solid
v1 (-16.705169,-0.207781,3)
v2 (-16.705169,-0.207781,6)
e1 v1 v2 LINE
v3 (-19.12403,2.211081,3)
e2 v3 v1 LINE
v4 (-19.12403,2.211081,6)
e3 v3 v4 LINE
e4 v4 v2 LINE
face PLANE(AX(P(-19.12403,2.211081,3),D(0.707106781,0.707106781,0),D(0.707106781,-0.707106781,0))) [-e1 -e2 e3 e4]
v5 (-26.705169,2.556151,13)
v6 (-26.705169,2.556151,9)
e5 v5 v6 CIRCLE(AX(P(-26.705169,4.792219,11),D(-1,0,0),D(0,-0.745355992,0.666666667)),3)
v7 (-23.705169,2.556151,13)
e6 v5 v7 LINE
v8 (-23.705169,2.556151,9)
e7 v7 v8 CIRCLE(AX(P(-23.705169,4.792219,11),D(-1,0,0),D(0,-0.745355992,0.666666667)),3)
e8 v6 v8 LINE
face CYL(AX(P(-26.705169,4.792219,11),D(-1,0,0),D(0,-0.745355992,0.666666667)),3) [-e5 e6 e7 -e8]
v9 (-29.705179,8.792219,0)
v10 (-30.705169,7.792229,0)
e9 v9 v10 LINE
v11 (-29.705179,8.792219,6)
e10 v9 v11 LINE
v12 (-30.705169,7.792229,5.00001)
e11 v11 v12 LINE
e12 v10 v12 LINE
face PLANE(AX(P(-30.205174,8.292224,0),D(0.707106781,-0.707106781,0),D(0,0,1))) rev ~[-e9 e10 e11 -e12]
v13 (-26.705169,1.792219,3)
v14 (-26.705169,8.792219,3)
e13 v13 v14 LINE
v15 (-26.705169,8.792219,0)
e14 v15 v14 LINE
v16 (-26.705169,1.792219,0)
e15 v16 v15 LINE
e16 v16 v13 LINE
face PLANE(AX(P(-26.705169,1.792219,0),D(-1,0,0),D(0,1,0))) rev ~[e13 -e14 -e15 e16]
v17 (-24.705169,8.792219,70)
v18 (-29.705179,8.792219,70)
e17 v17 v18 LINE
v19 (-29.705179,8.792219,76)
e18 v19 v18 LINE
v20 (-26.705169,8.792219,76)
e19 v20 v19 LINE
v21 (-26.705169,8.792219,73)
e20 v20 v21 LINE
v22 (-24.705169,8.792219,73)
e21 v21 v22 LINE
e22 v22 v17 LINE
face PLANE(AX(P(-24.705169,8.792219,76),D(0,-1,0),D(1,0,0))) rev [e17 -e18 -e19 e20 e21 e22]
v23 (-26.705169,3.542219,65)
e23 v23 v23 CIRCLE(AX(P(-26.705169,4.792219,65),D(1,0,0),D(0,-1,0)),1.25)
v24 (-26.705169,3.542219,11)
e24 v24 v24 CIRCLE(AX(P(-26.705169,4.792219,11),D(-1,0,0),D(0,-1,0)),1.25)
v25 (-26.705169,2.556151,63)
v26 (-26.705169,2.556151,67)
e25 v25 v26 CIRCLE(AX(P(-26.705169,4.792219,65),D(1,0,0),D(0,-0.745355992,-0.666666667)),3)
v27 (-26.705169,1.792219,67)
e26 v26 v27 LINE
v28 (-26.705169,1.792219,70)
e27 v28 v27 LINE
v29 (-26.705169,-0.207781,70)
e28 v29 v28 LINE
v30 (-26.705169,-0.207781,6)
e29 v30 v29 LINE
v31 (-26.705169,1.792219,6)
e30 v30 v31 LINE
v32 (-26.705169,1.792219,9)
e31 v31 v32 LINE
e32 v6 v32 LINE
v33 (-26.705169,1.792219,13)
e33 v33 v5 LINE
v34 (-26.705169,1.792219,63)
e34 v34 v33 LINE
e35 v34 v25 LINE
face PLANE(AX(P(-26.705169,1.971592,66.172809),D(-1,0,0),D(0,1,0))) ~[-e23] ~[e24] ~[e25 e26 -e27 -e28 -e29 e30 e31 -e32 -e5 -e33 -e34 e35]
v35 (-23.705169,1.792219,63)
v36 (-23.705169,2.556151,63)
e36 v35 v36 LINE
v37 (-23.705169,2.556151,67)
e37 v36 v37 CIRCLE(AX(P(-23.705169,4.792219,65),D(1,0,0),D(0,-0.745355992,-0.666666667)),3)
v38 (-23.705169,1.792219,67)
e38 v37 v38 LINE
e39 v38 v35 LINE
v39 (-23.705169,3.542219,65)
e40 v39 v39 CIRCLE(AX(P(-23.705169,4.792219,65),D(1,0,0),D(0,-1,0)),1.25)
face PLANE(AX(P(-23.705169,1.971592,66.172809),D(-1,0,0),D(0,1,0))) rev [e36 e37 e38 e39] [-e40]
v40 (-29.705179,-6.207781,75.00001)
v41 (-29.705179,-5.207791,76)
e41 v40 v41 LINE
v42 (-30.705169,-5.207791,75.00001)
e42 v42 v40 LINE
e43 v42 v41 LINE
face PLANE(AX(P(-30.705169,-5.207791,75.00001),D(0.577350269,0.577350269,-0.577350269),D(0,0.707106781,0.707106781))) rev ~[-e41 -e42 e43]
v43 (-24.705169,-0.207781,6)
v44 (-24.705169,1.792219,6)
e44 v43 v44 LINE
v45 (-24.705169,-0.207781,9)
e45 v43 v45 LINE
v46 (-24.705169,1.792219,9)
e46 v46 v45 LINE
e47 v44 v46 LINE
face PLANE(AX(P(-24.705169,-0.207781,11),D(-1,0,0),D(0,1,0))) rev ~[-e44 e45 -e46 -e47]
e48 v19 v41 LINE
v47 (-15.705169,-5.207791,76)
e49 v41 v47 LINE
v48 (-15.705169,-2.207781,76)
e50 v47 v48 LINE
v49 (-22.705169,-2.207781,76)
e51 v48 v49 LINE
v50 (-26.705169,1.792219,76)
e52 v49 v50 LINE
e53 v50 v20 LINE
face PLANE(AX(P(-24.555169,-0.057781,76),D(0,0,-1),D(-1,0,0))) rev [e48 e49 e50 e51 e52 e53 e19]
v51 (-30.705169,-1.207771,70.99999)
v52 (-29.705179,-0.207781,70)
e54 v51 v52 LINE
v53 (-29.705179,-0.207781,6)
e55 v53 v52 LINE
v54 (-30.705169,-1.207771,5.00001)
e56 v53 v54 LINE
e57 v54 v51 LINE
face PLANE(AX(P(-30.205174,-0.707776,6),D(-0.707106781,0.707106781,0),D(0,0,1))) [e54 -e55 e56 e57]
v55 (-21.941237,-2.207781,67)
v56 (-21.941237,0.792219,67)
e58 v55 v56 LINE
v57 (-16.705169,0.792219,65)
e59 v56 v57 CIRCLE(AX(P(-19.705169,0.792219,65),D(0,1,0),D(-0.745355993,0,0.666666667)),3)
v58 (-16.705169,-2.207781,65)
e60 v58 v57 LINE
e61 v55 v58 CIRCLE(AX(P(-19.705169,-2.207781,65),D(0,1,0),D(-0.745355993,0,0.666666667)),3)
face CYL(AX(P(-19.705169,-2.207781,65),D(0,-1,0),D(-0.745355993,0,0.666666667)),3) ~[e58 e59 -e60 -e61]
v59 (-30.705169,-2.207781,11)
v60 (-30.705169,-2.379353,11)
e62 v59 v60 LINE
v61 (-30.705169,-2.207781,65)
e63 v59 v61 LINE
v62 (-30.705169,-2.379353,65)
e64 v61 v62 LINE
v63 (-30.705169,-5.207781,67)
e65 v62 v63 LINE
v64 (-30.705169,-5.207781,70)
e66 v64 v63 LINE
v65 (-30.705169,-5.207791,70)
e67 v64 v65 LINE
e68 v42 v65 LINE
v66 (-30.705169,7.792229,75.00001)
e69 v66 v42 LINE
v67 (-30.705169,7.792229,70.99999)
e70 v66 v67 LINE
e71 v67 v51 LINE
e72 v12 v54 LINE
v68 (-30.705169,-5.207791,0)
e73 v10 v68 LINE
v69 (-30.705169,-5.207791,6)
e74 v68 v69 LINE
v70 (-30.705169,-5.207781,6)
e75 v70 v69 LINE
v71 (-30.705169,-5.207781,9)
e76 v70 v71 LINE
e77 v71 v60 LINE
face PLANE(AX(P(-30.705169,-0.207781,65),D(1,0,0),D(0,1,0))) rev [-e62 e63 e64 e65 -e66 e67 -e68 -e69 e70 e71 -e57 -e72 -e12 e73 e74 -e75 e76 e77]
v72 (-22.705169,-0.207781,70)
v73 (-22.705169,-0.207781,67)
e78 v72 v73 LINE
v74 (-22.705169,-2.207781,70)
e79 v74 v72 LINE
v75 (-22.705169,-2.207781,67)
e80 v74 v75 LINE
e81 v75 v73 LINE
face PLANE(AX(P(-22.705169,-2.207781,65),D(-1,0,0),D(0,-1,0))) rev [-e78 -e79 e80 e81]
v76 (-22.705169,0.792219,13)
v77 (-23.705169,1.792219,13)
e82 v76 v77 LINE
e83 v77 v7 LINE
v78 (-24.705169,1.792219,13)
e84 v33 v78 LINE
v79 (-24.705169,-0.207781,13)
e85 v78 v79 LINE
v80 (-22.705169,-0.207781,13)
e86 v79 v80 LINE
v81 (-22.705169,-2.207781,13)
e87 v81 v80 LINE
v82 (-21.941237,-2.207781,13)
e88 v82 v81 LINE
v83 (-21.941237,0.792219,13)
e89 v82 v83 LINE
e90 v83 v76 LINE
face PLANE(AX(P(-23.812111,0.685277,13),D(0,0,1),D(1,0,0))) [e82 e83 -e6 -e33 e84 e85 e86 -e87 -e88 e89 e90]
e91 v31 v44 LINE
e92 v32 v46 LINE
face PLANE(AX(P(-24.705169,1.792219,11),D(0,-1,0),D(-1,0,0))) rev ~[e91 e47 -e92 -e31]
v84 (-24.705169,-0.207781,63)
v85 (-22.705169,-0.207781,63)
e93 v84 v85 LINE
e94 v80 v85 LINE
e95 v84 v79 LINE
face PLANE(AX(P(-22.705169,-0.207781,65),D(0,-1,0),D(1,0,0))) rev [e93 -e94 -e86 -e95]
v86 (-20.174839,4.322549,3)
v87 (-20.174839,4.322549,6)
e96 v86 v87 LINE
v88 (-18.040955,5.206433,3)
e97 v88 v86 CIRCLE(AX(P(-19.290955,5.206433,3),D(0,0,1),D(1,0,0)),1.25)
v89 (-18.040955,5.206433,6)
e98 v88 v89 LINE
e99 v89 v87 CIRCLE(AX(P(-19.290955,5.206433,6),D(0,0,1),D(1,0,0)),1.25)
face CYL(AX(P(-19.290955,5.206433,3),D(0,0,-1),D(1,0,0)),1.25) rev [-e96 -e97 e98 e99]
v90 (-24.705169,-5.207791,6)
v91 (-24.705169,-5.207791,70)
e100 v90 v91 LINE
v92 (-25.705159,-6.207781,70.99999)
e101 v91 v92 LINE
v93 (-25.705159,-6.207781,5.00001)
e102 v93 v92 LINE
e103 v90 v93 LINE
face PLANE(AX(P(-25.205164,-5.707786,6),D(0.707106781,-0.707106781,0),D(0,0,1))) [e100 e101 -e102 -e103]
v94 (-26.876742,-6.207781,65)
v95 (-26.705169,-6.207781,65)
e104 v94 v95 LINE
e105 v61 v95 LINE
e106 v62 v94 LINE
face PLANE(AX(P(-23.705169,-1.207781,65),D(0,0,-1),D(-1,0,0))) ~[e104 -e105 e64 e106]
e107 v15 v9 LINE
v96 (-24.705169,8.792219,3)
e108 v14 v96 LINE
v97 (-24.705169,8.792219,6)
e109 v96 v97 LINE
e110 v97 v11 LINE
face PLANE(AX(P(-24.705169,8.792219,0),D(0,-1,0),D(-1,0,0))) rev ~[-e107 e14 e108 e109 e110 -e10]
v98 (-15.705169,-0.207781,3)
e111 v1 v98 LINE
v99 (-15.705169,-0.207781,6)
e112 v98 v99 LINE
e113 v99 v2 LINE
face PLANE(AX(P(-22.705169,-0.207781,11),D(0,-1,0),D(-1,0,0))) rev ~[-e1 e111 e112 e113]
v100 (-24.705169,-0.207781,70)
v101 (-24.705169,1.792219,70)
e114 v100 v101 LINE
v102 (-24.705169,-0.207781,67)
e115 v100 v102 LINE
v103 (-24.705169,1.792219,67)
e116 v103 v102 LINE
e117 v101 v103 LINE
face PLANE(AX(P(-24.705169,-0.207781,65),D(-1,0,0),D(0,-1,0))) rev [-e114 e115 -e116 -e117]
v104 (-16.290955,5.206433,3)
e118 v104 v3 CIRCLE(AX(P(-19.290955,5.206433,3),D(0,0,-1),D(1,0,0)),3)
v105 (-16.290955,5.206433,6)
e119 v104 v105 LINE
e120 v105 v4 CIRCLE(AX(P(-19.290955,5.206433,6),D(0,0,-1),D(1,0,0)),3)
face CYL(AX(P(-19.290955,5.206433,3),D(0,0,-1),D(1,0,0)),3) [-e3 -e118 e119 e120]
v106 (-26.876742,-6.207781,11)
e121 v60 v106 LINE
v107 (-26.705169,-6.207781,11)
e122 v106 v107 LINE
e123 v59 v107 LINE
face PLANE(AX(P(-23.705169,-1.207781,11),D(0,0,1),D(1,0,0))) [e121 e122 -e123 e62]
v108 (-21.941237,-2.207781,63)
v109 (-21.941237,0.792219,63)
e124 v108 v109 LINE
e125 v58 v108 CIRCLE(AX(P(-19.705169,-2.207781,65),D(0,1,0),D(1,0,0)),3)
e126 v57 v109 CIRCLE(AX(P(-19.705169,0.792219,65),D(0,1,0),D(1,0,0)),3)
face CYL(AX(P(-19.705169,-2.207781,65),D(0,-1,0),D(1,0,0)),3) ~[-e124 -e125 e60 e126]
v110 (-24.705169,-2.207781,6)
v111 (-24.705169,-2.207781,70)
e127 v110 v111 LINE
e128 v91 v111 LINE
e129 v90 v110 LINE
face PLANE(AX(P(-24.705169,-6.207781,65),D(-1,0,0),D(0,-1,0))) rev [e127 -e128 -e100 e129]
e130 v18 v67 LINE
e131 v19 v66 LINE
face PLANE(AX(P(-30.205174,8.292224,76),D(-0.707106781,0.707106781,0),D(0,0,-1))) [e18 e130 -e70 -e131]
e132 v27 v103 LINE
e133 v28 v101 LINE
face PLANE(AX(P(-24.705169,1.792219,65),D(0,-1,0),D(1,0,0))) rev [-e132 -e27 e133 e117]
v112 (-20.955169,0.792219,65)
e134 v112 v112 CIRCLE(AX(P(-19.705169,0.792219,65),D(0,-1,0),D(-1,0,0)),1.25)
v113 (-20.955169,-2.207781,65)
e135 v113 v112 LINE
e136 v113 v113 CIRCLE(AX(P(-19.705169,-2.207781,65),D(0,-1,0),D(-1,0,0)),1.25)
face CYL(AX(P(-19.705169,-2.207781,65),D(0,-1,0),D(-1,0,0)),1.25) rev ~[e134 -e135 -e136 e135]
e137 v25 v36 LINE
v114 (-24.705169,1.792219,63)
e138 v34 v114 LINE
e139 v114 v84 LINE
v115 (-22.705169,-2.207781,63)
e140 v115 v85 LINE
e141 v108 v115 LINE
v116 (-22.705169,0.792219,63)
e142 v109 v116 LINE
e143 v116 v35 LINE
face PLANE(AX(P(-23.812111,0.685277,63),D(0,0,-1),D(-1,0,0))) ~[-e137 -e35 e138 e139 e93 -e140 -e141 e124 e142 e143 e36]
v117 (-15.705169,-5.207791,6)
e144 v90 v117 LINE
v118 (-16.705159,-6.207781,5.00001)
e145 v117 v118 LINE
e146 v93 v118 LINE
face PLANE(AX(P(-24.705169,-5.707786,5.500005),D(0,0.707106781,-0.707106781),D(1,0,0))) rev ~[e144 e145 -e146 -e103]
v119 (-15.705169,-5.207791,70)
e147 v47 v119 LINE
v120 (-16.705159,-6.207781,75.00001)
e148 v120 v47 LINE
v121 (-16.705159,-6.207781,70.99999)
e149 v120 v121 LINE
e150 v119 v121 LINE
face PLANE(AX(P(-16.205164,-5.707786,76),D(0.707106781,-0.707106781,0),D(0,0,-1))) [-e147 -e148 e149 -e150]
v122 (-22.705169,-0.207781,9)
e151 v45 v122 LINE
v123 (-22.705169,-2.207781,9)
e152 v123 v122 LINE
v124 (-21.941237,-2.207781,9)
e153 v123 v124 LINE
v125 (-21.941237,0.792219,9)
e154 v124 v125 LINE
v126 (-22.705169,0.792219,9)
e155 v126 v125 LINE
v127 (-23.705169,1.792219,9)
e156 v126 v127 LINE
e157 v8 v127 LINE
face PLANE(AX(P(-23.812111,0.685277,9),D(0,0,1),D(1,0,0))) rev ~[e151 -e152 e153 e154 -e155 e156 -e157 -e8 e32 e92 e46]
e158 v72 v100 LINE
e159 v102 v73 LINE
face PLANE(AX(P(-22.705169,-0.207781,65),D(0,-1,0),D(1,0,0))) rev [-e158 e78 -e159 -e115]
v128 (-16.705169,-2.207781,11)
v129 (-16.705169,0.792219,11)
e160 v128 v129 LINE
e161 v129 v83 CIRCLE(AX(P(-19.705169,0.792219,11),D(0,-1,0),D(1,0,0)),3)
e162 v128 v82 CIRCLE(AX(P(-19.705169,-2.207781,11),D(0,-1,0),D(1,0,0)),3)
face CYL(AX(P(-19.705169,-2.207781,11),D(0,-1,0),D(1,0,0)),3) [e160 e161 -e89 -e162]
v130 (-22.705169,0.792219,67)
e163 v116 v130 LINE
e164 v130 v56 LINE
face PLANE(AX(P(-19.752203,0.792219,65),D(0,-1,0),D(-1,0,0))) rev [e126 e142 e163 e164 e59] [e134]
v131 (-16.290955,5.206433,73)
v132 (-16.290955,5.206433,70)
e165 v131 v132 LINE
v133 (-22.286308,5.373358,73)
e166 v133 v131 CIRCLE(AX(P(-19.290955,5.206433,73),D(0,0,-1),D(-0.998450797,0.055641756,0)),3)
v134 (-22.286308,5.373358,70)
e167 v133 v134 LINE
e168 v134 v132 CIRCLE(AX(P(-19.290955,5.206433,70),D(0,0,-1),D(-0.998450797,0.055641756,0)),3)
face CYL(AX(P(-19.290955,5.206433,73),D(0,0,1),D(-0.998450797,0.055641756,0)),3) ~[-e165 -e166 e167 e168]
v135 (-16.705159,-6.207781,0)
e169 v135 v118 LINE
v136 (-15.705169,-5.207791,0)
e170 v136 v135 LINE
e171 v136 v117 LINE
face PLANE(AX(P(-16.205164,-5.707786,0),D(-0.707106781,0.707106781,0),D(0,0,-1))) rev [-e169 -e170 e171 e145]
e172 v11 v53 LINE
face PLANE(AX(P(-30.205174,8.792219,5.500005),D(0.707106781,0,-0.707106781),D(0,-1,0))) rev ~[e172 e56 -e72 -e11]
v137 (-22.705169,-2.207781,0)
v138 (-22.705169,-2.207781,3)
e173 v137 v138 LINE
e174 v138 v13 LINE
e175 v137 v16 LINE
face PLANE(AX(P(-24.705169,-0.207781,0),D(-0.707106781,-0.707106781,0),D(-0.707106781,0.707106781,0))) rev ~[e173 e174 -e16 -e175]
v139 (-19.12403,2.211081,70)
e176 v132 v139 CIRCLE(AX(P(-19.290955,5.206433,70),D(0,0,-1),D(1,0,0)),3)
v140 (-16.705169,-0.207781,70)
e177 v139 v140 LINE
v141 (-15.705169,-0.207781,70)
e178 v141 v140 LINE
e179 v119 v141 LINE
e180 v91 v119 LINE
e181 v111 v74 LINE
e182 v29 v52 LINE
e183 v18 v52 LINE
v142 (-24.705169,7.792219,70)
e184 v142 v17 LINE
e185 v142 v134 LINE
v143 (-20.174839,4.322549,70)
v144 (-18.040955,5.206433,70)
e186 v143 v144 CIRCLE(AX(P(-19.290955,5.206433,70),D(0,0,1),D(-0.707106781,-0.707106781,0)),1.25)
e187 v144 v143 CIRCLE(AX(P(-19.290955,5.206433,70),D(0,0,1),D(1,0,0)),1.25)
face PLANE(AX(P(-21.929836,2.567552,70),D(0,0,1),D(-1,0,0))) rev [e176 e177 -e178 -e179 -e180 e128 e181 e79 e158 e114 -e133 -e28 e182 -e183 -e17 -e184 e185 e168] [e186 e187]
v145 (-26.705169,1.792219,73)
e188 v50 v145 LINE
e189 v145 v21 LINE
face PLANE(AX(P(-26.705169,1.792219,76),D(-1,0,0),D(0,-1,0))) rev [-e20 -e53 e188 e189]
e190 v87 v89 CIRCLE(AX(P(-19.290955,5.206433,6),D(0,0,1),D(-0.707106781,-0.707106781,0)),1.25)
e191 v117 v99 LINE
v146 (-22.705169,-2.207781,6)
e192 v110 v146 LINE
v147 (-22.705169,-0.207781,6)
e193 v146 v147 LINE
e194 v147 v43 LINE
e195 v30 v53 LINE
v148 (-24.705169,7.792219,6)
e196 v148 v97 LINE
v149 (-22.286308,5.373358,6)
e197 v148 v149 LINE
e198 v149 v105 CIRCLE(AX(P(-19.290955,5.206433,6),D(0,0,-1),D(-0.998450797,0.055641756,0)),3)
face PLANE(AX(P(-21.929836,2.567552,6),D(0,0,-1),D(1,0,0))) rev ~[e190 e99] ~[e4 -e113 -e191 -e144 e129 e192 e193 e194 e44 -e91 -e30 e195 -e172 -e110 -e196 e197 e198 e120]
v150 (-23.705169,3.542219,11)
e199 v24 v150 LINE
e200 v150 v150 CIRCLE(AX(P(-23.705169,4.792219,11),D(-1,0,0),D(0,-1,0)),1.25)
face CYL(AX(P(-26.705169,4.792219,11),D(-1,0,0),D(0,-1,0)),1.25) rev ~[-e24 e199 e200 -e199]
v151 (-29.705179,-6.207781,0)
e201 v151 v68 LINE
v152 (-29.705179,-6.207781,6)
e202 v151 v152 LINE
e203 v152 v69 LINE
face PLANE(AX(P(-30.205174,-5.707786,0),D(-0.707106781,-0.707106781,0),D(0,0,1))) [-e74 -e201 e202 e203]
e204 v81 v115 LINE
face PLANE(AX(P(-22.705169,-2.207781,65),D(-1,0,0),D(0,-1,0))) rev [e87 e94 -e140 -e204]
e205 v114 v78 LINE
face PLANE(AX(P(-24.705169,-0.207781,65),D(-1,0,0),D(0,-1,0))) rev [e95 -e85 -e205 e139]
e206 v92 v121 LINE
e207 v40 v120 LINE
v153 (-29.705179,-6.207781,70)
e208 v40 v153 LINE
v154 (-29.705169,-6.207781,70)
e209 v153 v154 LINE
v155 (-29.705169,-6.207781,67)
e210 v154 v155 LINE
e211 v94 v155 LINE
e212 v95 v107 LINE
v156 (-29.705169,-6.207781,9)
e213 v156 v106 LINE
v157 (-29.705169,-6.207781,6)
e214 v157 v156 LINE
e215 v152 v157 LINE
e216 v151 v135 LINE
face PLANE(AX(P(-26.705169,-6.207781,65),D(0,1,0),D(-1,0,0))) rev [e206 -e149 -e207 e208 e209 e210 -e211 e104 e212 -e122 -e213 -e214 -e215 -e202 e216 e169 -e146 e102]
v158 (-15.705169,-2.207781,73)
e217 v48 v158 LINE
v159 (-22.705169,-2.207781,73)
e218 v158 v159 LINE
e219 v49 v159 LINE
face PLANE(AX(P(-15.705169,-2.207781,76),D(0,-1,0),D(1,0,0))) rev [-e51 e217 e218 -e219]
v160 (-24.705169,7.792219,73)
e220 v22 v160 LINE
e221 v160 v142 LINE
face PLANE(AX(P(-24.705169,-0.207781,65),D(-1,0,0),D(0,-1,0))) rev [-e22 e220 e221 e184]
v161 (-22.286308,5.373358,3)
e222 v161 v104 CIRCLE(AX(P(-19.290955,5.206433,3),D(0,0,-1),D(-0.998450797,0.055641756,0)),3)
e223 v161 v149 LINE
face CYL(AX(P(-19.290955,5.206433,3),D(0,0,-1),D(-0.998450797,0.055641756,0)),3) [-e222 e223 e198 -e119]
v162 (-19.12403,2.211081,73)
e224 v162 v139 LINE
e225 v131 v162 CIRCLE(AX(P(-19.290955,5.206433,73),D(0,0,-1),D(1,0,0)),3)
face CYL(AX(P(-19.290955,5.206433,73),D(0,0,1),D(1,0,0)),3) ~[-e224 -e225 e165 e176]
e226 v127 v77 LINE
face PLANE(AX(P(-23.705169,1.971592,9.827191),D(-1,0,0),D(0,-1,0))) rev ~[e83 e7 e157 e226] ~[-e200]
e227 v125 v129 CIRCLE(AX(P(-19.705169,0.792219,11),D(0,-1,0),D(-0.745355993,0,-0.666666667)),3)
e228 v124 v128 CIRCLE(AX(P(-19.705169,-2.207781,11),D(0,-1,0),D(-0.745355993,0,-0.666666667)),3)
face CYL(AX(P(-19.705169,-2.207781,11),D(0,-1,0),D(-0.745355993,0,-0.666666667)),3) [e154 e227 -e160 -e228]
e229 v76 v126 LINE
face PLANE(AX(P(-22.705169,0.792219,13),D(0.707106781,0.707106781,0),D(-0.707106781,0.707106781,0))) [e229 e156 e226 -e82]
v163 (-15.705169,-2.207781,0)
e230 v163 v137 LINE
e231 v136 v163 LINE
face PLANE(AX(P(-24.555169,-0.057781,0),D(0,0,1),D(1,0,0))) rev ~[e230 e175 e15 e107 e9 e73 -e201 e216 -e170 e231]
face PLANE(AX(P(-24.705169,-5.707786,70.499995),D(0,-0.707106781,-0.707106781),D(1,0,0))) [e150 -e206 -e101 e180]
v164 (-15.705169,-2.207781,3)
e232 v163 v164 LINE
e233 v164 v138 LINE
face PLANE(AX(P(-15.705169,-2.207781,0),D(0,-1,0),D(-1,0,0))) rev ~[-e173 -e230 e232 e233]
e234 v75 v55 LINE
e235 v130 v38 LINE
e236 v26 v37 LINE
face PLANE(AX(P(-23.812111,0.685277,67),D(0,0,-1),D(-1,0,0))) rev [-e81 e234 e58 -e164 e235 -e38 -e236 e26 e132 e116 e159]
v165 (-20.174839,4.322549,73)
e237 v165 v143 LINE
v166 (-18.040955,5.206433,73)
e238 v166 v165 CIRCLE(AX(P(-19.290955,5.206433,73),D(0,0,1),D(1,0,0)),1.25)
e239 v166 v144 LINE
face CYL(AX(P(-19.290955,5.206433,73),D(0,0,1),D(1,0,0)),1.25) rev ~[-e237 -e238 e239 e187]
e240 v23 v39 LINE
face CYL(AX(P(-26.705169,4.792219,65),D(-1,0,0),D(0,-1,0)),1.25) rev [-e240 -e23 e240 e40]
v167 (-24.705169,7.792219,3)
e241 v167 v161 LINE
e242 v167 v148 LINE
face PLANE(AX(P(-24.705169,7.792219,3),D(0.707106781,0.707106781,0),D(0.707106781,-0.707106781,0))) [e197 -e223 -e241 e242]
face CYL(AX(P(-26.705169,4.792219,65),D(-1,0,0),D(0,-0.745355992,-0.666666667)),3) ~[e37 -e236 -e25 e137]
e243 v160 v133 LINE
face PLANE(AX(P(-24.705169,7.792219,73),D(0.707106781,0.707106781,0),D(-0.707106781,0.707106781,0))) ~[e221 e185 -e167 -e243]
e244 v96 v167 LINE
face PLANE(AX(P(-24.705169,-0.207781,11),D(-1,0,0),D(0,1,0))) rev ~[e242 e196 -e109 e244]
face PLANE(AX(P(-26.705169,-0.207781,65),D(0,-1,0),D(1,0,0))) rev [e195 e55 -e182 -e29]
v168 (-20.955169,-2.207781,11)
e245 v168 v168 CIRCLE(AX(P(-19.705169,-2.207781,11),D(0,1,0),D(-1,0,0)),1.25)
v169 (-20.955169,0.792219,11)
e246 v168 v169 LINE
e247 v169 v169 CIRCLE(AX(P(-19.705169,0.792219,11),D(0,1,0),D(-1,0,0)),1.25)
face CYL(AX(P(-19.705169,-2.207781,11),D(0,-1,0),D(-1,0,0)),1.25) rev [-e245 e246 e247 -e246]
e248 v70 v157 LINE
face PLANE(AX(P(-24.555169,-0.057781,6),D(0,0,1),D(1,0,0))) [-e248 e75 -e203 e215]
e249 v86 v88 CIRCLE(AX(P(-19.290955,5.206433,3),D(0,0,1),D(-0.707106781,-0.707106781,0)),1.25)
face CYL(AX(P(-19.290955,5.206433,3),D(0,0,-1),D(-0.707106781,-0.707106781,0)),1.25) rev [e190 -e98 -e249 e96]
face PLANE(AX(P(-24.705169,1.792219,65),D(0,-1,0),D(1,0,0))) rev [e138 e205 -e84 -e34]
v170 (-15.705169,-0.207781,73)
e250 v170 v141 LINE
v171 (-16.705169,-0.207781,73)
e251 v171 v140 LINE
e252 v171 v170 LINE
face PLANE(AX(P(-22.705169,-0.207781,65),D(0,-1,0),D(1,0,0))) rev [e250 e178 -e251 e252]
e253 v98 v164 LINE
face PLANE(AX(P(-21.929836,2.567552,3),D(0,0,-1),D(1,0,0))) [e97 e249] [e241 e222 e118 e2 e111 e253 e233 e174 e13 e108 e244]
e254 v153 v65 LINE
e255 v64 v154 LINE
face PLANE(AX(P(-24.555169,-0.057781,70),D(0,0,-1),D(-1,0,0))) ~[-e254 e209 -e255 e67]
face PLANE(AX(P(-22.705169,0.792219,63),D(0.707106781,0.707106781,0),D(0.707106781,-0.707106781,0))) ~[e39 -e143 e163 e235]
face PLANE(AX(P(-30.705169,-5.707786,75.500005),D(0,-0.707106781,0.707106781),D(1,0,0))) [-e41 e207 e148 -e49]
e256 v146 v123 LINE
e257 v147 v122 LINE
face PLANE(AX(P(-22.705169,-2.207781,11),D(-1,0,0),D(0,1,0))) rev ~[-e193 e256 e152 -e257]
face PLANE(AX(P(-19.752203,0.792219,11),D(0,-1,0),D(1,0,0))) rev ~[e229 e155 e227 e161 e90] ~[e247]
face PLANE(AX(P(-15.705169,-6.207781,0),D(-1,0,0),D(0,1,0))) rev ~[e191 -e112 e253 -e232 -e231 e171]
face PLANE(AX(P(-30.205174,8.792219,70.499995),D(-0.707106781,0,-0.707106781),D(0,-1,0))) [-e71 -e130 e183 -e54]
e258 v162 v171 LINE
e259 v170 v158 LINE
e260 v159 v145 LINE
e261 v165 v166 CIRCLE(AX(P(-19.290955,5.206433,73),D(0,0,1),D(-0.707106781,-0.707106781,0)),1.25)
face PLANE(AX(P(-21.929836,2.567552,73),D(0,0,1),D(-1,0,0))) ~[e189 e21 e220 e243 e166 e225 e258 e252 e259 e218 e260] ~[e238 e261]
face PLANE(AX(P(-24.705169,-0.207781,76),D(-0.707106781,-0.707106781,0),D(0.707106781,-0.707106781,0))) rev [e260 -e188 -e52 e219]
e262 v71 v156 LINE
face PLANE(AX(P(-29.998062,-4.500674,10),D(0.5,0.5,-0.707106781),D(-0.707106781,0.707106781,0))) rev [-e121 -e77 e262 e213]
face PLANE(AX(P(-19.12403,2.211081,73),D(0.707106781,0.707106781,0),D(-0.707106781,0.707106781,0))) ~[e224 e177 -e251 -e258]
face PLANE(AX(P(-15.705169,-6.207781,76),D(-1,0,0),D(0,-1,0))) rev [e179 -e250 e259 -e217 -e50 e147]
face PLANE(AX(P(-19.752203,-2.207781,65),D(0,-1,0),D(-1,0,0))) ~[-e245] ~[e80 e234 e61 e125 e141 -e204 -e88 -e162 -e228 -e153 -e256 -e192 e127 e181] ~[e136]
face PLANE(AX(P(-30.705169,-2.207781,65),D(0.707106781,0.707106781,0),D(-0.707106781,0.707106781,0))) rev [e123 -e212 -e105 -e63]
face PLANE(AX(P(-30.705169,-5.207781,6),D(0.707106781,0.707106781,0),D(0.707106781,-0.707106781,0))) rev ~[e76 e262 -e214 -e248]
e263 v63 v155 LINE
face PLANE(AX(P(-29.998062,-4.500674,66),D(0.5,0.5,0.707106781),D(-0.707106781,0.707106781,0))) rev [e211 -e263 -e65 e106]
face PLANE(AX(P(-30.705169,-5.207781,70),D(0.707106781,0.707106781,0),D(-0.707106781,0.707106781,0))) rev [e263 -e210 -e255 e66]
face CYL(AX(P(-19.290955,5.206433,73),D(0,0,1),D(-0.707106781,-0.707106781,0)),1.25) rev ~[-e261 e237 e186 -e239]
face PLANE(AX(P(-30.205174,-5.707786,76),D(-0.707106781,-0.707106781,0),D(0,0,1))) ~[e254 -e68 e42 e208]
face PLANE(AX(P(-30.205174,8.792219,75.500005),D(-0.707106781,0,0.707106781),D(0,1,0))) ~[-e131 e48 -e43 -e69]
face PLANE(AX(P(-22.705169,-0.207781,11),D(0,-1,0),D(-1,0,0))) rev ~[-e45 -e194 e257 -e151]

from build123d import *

# Parameters (mm, degrees)
F1_DEPTH  = 6
F2_W      = 2
F2_H      = 2
F3_DEPTH  = 5
F5_DEPTH  = 27
F7_DEPTH  = 3
F8_R      = 1.25
F9_DEPTH  = 3
F11_DEPTH = 4
F13_DEPTH = 3
F15_DEPTH = 3
F17_SIZE  = 0.99999
F18_SIZE  = 2


# Not quite as in the source:
# - a fillet or chamfer is up to 0.001 mm smaller than in the source, because OpenCascade refuses the exact size
# - a feature names something its author has since deleted; it is built from what else it names


with BuildPart() as f1:
    # F0 (on Top) → F1 (new body)
    with BuildSketch(Plane.XY):
        Polygon((-29.7051688433, 8.7922193985), (-30.7051688433, 8.7922193985), (-30.7051688433, -6.2077806015), (-15.7051688433, -6.2077806015), (-15.7051688433, -5.2077806015), (-15.7051688433, -0.2077806015), (-24.7051688433, -0.2077806015), (-24.7051688433, 8.7922193985), align=None)
    extrude(amount=F1_DEPTH)

    # F2 (on face) → F3 (join)
    with BuildSketch(Plane.XY.offset(6)):
        with Locations((-23.7051688433, -1.2077806015)):
            Rectangle(F2_W, F2_H)
        Polygon((-26.7051688433, -0.2077806015), (-30.7051688433, -0.2077806015), (-30.7051688433, -5.2077806015), (-29.7051688433, -6.2077806015), (-24.7051688433, -6.2077806015), (-24.7051688433, -2.2077806015), (-24.7051688433, -0.2077806015), align=None)
        with Locations((-25.7051688433, 0.7922193985)):
            Rectangle(F2_W, F2_H)
    extrude(amount=F3_DEPTH)

    # F4 (on face) → F5 (join)
    with BuildSketch(Plane.XY.offset(11)):
        Polygon((-26.7051688433, -6.2077806015), (-24.7051688433, -6.2077806015), (-24.7051688433, -2.2077806015), (-22.7051688433, -2.2077806015), (-22.7051688433, -0.2077806015), (-24.7051688433, -0.2077806015), (-24.7051688433, 1.7922193985), (-26.7051688433, 1.7922193985), (-26.7051688433, -0.2077806015), (-30.7051688433, -0.2077806015), (-30.7051688433, -2.2077806015), align=None)
    extrude(amount=F5_DEPTH)

    # F6 (on face) → F7 (join)
    with BuildSketch(Plane.XZ.offset(2.2077806015)):
        with BuildLine():
            ThreePointArc((-21.9412368208, 13), (-22.5076859202, 12.0704662693), (-22.7051688433, 11))
            ThreePointArc((-22.7051688433, 11), (-22.5076859202, 9.9295337307), (-21.9412368208, 9))
            ThreePointArc((-21.9412368208, 9), (-18.634702574, 8.1974829231), (-16.7051688433, 11))
            ThreePointArc((-16.7051688433, 11), (-18.634702574, 13.8025170769), (-21.9412368208, 13))
        make_face()
        with BuildLine():
            ThreePointArc((-18.4551688433, 11), (-19.7051688433, 9.75), (-20.9551688433, 11))
            ThreePointArc((-20.9551688433, 11), (-19.7051688433, 12.25), (-18.4551688433, 11))
        make_face(mode=Mode.SUBTRACT)
        with BuildLine():
            Line((-22.7051688433, 13), (-22.7051688433, 11))
            ThreePointArc((-22.7051688433, 11), (-22.5076859202, 12.0704662693), (-21.9412368208, 13))
            Line((-21.9412368208, 13), (-22.7051688433, 13))
        make_face()
        with BuildLine():
            Line((-22.7051688433, 11), (-22.7051688433, 9))
            Line((-22.7051688433, 9), (-21.9412368208, 9))
            ThreePointArc((-21.9412368208, 9), (-22.5076859202, 9.9295337307), (-22.7051688433, 11))
        make_face()
    extrude(amount=-F7_DEPTH)

    # F8 (on face) → F9 (join)
    with BuildSketch(Plane(origin=(-26.7051688433, 0, 0), x_dir=(0, -1, 0), z_dir=(-1, 0, 0))):
        with BuildLine():
            Line((-2.556151421, 9), (-1.7922193985, 9))
            Line((-1.7922193985, 9), (-1.7922193985, 11))
            ThreePointArc((-1.7922193985, 11), (-1.9897023217, 9.9295337307), (-2.556151421, 9))
        make_face()
        with BuildLine():
            ThreePointArc((-2.556151421, 13), (-1.9897023217, 12.0704662693), (-1.7922193985, 11))
            Line((-1.7922193985, 11), (-1.7922193985, 13))
            Line((-1.7922193985, 13), (-2.556151421, 13))
        make_face()
        with BuildLine():
            ThreePointArc((-2.556151421, 9), (-1.9897023217, 9.9295337307), (-1.7922193985, 11))
            ThreePointArc((-1.7922193985, 11), (-1.9897023217, 12.0704662693), (-2.556151421, 13))
            ThreePointArc((-2.556151421, 13), (-7.7922193985, 11), (-2.556151421, 9))
        make_face()
        with Locations((-4.7922193985, 11)):
            Circle(F8_R, mode=Mode.SUBTRACT)
    extrude(amount=-F9_DEPTH)

    # F10 (on face) → F11 (join)
    with BuildSketch(Plane.XY.offset(13)):
        Polygon((-22.7051688433, 0.7922193985), (-23.7051688433, 1.7922193985), (-24.7051688433, 1.7922193985), (-24.7051688433, -0.2077806015), (-22.7051688433, -0.2077806015), align=None)
    extrude(amount=-F11_DEPTH)

    # F12 (on face) → F13 (cut)
    with BuildSketch(Plane(origin=(0, 0, 0), x_dir=(1, 0, 0), z_dir=(0, 0, -1))):
        Polygon((-24.7051688433, -8.7922193985), (-24.7051688433, 0.2077806015), (-26.7051688433, -1.7922193985), (-26.7051688433, -8.7922193985), align=None)
        Polygon((-24.7051688433, 0.2077806015), (-15.7051688433, 0.2077806015), (-15.7051688433, 2.2077806015), (-22.7051688433, 2.2077806015), align=None)
    extrude(amount=-F13_DEPTH, mode=Mode.SUBTRACT)

    # F14 (on face) → F15 (join)
    with BuildSketch(Plane(origin=(0, 0, 3), x_dir=(1, 0, 0), z_dir=(0, 0, -1))):
        with BuildLine():
            Line((-16.7051688433, 0.2077806015), (-24.7051688433, 0.2077806015))
            Line((-24.7051688433, 0.2077806015), (-24.7051688433, -7.7922193985))
            Line((-24.7051688433, -7.7922193985), (-22.2863076734, -5.3733582286))
            ThreePointArc((-22.2863076734, -5.3733582286), (-21.4122756245, -3.0851126174), (-19.1240300132, -2.2110805685))
            Line((-19.1240300132, -2.2110805685), (-16.7051688433, 0.2077806015))
        make_face()
        with BuildLine():
            ThreePointArc((-19.1240300132, -2.2110805685), (-21.4122756245, -3.0851126174), (-22.2863076734, -5.3733582286))
            Line((-22.2863076734, -5.3733582286), (-20.7051688433, -3.7922193985))
            Line((-20.7051688433, -3.7922193985), (-19.1240300132, -2.2110805685))
        make_face()
        with BuildLine():
            Line((-20.7051688433, -3.7922193985), (-22.2863076734, -5.3733582286))
            ThreePointArc((-22.2863076734, -5.3733582286), (-19.2074603031, -8.2052708339), (-16.2909552809, -5.2064329609))
            ThreePointArc((-16.2909552809, -5.2064329609), (-17.1114168202, -3.1449742302), (-19.1240300132, -2.2110805685))
            Line((-19.1240300132, -2.2110805685), (-20.7051688433, -3.7922193985))
        make_face()
        with BuildLine():
            ThreePointArc((-18.0409552809, -5.2064329609), (-19.7693095714, -6.3612823766), (-20.1748387574, -4.3225494844))
            ThreePointArc((-20.1748387574, -4.3225494844), (-18.8126009904, -4.0515835453), (-18.0409552809, -5.2064329609))
        make_face(mode=Mode.SUBTRACT)
    extrude(amount=-F15_DEPTH)

    # F16: F1 across face


with BuildPart() as f1_1:
    add(f1.part)
    add(f1.part.mirror(Plane(origin=(-26.6681318062, -2.1707435644, 38), x_dir=(1, 0, 0), z_dir=(0, 0, 1))))

    # F17 (size 1 in the source; OpenCascade refuses exactly that, so slightly less here)
    f17_edges = [f1_1.edges().sort_by_distance(p)[0] for p in [
        (-24.705169, -6.207781, 38),
        (-20.205169, -6.207781, 6),
        (-30.705169, 4.292219, 6),
        (-30.705169, -0.207781, 38),
        (-30.705169, 4.292219, 70),
        (-20.205169, -6.207781, 70),
        (-15.705169, -6.207781, 73),
        (-30.705169, 8.792219, 73),
        (-23.205169, -6.207781, 76),
        (-30.705169, -6.207781, 73),
        (-30.705169, 1.292219, 76),
        (-30.705169, 8.792219, 3),
        (-30.705169, -6.207781, 3),
        (-15.705169, -6.207781, 3),
    ]]
    chamfer(f17_edges, length=F17_SIZE)

    # F18
    f18_edges = [f1_1.edges().sort_by_distance(p)[0] for p in [
        (-30.205169, -5.707781, 11),
        (-30.205169, -5.707781, 65),
    ]]
    chamfer(f18_edges, length=F18_SIZE)


solid = f1_1.part
